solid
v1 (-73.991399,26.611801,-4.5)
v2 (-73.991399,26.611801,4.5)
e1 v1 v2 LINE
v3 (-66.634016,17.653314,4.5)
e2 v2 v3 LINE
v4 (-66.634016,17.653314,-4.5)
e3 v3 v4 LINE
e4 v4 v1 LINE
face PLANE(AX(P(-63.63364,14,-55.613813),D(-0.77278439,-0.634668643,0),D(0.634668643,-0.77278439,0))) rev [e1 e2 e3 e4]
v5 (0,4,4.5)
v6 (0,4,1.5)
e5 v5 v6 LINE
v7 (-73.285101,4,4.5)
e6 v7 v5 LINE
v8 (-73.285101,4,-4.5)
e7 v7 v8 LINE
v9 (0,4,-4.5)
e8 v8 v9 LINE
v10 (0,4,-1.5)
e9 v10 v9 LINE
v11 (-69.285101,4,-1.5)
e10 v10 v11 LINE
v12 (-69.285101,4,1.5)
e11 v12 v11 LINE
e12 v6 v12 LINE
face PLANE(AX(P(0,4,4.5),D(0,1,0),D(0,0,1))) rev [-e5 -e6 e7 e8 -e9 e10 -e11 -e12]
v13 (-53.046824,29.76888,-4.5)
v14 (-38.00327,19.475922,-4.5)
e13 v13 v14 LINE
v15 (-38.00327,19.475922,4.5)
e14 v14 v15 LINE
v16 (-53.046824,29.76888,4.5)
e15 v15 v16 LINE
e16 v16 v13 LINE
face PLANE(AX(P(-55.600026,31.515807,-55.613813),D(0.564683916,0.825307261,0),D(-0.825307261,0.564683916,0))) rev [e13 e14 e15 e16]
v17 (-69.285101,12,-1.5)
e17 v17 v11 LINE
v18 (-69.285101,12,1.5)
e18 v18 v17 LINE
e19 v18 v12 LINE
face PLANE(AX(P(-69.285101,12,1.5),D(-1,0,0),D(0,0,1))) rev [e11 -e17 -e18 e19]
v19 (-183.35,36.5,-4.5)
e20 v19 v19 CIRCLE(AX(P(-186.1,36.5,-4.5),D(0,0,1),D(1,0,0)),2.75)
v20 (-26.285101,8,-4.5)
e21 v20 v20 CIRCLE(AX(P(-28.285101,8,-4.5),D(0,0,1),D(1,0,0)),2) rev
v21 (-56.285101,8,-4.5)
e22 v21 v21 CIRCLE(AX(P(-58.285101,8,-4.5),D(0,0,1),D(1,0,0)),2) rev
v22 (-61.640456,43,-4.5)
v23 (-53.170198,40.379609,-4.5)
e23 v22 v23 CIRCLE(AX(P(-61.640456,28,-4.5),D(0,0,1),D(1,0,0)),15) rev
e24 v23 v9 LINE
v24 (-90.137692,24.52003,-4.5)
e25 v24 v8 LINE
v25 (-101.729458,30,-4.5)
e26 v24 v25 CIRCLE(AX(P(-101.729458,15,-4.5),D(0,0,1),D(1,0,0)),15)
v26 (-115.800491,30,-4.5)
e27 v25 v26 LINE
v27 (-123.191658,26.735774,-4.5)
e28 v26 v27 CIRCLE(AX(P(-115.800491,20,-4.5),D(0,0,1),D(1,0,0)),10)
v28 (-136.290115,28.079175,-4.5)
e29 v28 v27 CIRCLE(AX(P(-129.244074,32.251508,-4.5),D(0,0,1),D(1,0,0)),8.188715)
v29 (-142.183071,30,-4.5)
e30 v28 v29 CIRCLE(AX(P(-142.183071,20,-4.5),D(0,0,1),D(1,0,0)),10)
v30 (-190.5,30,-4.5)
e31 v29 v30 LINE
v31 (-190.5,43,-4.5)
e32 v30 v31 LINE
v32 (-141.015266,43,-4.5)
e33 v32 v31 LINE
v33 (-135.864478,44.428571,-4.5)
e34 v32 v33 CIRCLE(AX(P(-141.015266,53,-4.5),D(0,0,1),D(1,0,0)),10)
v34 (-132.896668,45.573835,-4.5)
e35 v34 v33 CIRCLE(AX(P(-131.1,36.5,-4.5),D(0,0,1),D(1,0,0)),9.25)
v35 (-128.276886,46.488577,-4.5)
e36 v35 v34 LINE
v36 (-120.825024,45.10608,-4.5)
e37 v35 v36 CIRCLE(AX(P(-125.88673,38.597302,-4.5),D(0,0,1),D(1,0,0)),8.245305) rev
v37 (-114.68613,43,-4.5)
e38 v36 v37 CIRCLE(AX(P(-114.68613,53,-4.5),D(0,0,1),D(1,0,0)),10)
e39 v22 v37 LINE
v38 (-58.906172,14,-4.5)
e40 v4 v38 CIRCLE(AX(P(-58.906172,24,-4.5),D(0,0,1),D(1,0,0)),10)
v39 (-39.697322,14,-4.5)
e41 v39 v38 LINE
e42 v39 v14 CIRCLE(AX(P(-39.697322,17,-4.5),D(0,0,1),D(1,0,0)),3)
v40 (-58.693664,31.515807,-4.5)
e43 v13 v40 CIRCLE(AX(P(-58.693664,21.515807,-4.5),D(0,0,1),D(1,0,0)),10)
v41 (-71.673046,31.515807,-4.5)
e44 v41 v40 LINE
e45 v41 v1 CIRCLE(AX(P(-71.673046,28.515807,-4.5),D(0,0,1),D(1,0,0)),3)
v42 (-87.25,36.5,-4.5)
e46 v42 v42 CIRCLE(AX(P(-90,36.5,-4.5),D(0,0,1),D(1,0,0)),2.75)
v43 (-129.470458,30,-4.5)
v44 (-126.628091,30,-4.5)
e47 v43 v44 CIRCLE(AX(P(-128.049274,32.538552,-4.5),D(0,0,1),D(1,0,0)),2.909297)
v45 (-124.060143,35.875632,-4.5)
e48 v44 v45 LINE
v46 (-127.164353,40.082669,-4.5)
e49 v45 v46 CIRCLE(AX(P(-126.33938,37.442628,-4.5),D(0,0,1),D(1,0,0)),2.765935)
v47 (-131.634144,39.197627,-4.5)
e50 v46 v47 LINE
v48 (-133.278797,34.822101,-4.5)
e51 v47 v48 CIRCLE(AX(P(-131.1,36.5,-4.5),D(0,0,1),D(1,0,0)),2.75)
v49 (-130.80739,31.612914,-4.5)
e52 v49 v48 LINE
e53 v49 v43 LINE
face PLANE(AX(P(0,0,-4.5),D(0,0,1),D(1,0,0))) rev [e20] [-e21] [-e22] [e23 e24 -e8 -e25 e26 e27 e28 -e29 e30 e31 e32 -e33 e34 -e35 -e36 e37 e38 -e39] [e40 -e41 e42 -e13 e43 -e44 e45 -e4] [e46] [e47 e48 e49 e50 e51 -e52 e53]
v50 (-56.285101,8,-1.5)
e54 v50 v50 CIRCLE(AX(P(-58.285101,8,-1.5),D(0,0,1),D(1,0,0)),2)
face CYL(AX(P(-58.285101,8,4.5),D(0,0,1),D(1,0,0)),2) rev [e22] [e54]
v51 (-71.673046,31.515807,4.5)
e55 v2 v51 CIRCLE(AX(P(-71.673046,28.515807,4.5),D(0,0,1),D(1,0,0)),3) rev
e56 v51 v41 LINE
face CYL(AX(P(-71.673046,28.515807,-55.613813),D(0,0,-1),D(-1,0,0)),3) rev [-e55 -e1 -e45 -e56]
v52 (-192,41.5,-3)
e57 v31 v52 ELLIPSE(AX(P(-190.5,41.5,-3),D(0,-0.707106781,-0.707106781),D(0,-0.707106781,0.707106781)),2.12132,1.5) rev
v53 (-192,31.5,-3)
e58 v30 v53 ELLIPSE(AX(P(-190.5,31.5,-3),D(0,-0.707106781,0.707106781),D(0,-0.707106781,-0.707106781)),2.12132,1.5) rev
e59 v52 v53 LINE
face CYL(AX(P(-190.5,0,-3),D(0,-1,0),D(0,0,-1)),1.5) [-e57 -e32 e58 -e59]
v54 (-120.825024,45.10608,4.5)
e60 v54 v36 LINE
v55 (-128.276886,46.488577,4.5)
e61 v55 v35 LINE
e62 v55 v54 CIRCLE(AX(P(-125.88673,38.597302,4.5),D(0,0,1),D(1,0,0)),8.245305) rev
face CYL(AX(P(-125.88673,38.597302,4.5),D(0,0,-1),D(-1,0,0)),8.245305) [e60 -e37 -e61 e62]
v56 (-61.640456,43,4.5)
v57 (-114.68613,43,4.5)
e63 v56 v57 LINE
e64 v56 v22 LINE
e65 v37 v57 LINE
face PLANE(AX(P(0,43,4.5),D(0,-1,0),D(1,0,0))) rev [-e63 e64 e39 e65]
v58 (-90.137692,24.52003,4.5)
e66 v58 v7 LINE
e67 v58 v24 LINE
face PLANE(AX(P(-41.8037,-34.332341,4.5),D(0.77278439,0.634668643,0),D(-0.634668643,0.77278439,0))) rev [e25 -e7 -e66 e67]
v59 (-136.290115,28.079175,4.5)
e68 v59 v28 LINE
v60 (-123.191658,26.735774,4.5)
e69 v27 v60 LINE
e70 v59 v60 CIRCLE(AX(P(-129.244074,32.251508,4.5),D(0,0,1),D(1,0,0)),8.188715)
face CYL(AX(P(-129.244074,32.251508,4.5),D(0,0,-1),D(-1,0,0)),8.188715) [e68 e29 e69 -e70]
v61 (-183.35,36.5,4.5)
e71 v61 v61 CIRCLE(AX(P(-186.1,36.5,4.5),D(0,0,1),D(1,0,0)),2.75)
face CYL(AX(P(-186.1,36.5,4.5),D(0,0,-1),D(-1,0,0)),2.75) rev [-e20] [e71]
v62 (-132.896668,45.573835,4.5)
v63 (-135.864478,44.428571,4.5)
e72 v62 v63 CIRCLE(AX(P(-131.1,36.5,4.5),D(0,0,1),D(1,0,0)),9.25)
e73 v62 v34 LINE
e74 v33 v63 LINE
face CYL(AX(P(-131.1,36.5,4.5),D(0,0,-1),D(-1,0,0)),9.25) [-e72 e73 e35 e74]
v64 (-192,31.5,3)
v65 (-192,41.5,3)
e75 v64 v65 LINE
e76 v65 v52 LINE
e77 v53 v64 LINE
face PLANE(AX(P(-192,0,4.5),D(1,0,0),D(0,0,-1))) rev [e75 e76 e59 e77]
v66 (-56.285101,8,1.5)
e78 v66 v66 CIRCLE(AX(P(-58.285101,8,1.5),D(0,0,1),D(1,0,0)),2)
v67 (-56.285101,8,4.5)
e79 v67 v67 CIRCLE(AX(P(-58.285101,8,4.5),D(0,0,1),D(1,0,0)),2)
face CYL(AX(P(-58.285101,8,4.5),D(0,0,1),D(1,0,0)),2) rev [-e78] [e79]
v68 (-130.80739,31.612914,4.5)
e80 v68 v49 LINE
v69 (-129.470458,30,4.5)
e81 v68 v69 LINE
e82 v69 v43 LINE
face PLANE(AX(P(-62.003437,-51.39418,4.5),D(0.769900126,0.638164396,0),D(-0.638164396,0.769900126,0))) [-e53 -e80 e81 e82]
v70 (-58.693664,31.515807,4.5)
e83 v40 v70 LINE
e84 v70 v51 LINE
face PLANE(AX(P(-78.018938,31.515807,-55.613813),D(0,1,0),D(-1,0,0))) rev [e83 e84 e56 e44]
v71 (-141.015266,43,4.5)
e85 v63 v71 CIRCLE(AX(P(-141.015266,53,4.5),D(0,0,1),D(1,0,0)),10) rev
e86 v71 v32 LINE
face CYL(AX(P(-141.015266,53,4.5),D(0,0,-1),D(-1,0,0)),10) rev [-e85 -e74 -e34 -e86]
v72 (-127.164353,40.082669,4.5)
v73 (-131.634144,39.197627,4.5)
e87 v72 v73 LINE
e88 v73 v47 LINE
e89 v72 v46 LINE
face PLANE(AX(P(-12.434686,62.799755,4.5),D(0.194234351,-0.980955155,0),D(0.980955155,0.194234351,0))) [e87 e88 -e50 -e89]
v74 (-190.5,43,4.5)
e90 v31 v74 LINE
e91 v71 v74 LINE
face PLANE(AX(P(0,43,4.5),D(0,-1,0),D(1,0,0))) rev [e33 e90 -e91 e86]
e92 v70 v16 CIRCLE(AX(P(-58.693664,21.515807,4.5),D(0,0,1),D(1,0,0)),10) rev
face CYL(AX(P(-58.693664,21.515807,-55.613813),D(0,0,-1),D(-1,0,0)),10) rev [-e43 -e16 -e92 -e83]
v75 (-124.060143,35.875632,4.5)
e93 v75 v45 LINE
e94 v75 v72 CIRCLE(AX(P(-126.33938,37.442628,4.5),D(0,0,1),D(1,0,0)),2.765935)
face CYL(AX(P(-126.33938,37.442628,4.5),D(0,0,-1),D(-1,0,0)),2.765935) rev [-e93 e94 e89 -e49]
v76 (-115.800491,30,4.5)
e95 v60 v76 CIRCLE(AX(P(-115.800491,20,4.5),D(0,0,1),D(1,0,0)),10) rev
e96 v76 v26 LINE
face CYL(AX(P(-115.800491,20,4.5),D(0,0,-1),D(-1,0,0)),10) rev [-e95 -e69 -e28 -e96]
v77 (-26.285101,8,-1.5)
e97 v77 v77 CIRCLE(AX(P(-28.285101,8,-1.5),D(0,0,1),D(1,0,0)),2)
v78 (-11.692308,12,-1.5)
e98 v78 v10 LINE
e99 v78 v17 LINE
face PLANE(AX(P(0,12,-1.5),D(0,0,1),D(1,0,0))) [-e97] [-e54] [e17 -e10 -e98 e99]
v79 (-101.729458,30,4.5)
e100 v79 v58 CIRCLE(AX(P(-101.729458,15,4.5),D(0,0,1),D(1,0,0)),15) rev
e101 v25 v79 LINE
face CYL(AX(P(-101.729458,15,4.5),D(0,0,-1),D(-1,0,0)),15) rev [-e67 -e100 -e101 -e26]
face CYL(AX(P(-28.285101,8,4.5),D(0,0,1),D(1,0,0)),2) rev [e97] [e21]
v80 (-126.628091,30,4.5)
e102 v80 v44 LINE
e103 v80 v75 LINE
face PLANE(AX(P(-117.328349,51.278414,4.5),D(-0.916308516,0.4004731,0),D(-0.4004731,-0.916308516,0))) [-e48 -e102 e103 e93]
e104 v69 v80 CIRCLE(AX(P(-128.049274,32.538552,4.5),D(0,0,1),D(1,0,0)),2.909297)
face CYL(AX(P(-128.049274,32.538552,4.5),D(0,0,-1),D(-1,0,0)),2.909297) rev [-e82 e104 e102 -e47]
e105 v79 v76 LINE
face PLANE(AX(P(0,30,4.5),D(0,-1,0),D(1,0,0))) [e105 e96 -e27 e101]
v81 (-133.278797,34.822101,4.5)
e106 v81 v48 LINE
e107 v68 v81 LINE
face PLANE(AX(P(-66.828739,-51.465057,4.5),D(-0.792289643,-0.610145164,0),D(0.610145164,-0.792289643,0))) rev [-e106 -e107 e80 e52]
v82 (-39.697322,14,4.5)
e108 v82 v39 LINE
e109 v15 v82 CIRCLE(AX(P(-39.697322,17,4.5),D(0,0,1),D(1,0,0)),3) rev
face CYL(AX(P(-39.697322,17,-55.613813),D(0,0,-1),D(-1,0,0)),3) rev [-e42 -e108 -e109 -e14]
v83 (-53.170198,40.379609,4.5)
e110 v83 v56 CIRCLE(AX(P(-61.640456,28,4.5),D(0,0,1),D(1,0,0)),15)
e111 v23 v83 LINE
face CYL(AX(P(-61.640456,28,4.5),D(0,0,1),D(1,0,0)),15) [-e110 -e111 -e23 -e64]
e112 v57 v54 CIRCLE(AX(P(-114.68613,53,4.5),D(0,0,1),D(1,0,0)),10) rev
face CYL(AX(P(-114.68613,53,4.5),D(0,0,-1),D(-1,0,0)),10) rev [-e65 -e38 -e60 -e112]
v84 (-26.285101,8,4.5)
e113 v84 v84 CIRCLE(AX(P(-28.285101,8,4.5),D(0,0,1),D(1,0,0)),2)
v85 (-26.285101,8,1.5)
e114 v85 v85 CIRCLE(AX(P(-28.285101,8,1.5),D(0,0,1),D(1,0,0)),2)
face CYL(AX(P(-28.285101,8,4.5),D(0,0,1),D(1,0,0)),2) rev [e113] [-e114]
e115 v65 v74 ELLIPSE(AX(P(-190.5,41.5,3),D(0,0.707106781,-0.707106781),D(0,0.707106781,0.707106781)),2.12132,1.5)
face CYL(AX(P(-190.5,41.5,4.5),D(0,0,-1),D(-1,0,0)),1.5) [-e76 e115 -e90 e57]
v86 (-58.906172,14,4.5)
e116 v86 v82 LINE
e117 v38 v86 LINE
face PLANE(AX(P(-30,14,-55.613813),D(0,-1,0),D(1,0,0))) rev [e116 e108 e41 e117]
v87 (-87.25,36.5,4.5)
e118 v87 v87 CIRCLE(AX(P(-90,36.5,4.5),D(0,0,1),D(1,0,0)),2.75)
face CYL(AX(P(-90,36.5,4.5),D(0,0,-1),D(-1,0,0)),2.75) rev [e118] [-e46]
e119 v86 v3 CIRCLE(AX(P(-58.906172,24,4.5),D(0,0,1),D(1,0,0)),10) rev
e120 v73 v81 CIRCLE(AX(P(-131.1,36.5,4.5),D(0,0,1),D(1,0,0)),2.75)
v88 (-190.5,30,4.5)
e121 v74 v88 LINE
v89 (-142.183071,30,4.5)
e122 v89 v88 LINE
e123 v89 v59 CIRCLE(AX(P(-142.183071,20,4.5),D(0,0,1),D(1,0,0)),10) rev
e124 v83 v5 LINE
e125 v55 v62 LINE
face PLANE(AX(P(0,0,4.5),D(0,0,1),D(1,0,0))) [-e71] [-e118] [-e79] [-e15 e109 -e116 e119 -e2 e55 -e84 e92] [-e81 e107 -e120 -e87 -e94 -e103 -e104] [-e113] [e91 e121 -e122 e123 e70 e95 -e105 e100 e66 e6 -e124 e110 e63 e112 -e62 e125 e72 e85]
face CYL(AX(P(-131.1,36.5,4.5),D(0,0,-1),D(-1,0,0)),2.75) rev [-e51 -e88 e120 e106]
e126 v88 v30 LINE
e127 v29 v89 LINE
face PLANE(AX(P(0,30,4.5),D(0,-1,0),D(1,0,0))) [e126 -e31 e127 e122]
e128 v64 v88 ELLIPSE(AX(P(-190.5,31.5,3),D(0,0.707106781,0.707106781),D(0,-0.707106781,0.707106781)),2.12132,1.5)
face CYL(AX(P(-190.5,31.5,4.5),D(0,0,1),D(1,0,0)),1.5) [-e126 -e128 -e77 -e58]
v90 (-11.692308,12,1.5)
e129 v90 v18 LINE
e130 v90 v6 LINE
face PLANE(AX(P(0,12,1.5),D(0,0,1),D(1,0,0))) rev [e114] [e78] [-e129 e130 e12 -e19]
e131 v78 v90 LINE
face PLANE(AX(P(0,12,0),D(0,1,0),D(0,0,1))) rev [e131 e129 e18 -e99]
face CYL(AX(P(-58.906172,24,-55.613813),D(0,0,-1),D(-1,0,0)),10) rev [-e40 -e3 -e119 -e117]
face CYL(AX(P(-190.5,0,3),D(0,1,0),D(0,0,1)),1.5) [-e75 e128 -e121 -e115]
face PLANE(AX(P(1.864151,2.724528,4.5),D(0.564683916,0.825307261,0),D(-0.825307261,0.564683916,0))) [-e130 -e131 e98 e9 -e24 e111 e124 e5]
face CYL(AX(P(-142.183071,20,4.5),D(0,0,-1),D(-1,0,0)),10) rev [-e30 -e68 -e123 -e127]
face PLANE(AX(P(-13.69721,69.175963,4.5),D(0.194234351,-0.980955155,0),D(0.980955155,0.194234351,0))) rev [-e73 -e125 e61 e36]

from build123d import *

# Parameters (mm, degrees)
SKETCH3_R                 = 2.75
BOSS_EXTRUDE3_DEPTH       = 4.5
FILLET13_R                = 15
FILLET14_START            = -4.5
FILLET14_DEPTH            = 9
SKETCH6_W                 = 69.28510074
SKETCH6_H                 = 3
CUT_EXTRUDE3_DEPTH        = 8
F_3_0MM_DOWEL_HOLE1_D     = 4
F_3_0MM_DOWEL_HOLE1_DEPTH = 9
F_3_0MM_DOWEL_HOLE1_TIP   = 1.201721238
CUT_EXTRUDE4_DEPTH        = 9
FILLET16_R                = 3
FILLET17_R                = 10
FILLET18_R                = 1.5


with BuildPart() as part:
    # Sketch3 → Boss-Extrude3 (new, symmetric)
    with BuildSketch(Plane.XY):
        with BuildLine():
            Line((0, 4), (-57, 43))
            Line((-57, 43), (-118.915266557, 43))
            ThreePointArc((-118.915266557, 43), (-123.007557158, 46.323583072), (-128.27688576, 46.488576653))
            Line((-128.27688576, 46.488576653), (-132.896667749, 45.573835187))
            ThreePointArc((-132.896667749, 45.573835187), (-135.482170861, 44.646108184), (-137.681223291, 43))
            Line((-137.681223291, 43), (-192, 43))
            Line((-192, 43), (-192, 30))
            Line((-192, 30), (-137.769349371, 30))
            Line((-137.769349371, 30), (-136.290115263, 28.079175362))
            ThreePointArc((-136.290115263, 28.079175362), (-129.185667244, 24.063000847), (-122.139231824, 28.180109937))
            Line((-122.139231824, 28.180109937), (-121.157209597, 30))
            Line((-121.157209597, 30), (-94.638255551, 30))
            Line((-94.638255551, 30), (-73.28510074, 4))
            Line((-73.28510074, 4), (-70, 4))
            Line((-70, 4), (0, 4))
        make_face()
        with BuildLine():
            Line((-124.060142597, 35.875632157), (-126.628090603, 30))
            ThreePointArc((-126.628090603, 30), (-128.04927418, 29.629254975), (-129.470457758, 30))
            Line((-129.470457758, 30), (-130.807389931, 31.612913936))
            Line((-130.807389931, 31.612913936), (-133.278796519, 34.822100799))
            ThreePointArc((-133.278796519, 34.822100799), (-133.674163723, 37.467564533), (-131.634144466, 39.197626677))
            Line((-131.634144466, 39.197626677), (-127.164353264, 40.082669168))
            ThreePointArc((-127.164353264, 40.082669168), (-124.113731215, 39.084848464), (-124.060142597, 35.875632157))
        make_face(mode=Mode.SUBTRACT)
        with Locations((-186.1, 36.5)):
            Circle(SKETCH3_R, mode=Mode.SUBTRACT)
        with Locations((-90, 36.5)):
            Circle(SKETCH3_R, mode=Mode.SUBTRACT)
    extrude(amount=BOSS_EXTRUDE3_DEPTH, both=True)

    # Fillet13
    fillet13_edges = [part.edges().sort_by_distance(p)[0] for p in [
        (-57, 43, 0),
        (-94.638255551, 30, 0),
    ]]
    fillet(fillet13_edges, radius=FILLET13_R)

    # Fillet14: read off the stored shape, not the designer's step
    # Fillet14 outline → Fillet14 (add)
    with BuildSketch(Plane.XY.offset(FILLET14_START)):
        with BuildLine():
            ThreePointArc((-122.139231824, 28.180109937), (-122.625925477, 27.42914609), (-123.191657584, 26.735774188))
            ThreePointArc((-123.191657584, 26.735774188), (-119.840432538, 29.147615588), (-115.800490823, 30))
            Line((-115.800490823, 30), (-121.157209597, 30))
            Line((-121.157209597, 30), (-122.139231824, 28.180109937))
        make_face()
        with BuildLine():
            ThreePointArc((-142.183070844, 30), (-139.084018861, 29.507674627), (-136.290115263, 28.079175362))
            Line((-136.290115263, 28.079175362), (-137.769349371, 30))
            Line((-137.769349371, 30), (-142.183070844, 30))
        make_face()
        with BuildLine():
            Line((-118.915266557, 43), (-114.686129887, 43))
            ThreePointArc((-114.686129887, 43), (-117.931187648, 43.541162856), (-120.825024465, 45.106079975))
            ThreePointArc((-120.825024465, 45.106079975), (-119.778687593, 44.13597249), (-118.915266557, 43))
        make_face()
        with BuildLine():
            ThreePointArc((-137.681223291, 43), (-136.817642976, 43.771248779), (-135.864478471, 44.428571429))
            ThreePointArc((-135.864478471, 44.428571429), (-138.342653588, 43.363758883), (-141.015266008, 43))
            Line((-141.015266008, 43), (-137.681223291, 43))
        make_face()
    extrude(amount=FILLET14_DEPTH)

    # Sketch6 → Cut-Extrude3 (cut)
    with BuildSketch(Plane.XZ.offset(-4)):
        with Locations((-34.64255037, 0)):
            Rectangle(SKETCH6_W, SKETCH6_H)
    extrude(amount=-CUT_EXTRUDE3_DEPTH, mode=Mode.SUBTRACT)

    # Ø3.0mm Dowel Hole1
    with Locations(Plane.XY.offset(4.5)):
        with Locations((-28.28510074, 8), (-58.28510074, 8)):
            Hole(F_3_0MM_DOWEL_HOLE1_D / 2, depth=F_3_0MM_DOWEL_HOLE1_DEPTH)
            with Locations((0, 0, -(F_3_0MM_DOWEL_HOLE1_DEPTH + F_3_0MM_DOWEL_HOLE1_TIP / 2))):  # 118° drill point
                Cone(0, F_3_0MM_DOWEL_HOLE1_D / 2, F_3_0MM_DOWEL_HOLE1_TIP, mode=Mode.SUBTRACT)

    # Sketch10 → Cut-Extrude4 (cut)
    with BuildSketch(Plane.XY.offset(4.5)):
        Polygon((-78.018937792, 31.515807302), (-55.600026057, 31.515807302), (-30, 14), (-63.633639909, 14), align=None)
    extrude(amount=-CUT_EXTRUDE4_DEPTH, mode=Mode.SUBTRACT)

    # Fillet16
    fillet16_edges = [part.edges().sort_by_distance(p)[0] for p in [
        (-78.018937792, 31.515807302, 0),
        (-30, 14, 0),
    ]]
    fillet(fillet16_edges, radius=FILLET16_R)

    # Fillet17
    fillet17_edges = [part.edges().sort_by_distance(p)[0] for p in [
        (-63.633639909, 14, 0),
        (-55.600026057, 31.515807302, 0),
    ]]
    fillet(fillet17_edges, radius=FILLET17_R)

    # Fillet18
    fillet18_edges = [part.edges().sort_by_distance(p)[0] for p in [
        (-192, 36.5, -4.5),
        (-192, 30, 0),
        (-192, 43, 0),
        (-192, 36.5, 4.5),
    ]]
    fillet(fillet18_edges, radius=FILLET18_R)


solid = part.part
